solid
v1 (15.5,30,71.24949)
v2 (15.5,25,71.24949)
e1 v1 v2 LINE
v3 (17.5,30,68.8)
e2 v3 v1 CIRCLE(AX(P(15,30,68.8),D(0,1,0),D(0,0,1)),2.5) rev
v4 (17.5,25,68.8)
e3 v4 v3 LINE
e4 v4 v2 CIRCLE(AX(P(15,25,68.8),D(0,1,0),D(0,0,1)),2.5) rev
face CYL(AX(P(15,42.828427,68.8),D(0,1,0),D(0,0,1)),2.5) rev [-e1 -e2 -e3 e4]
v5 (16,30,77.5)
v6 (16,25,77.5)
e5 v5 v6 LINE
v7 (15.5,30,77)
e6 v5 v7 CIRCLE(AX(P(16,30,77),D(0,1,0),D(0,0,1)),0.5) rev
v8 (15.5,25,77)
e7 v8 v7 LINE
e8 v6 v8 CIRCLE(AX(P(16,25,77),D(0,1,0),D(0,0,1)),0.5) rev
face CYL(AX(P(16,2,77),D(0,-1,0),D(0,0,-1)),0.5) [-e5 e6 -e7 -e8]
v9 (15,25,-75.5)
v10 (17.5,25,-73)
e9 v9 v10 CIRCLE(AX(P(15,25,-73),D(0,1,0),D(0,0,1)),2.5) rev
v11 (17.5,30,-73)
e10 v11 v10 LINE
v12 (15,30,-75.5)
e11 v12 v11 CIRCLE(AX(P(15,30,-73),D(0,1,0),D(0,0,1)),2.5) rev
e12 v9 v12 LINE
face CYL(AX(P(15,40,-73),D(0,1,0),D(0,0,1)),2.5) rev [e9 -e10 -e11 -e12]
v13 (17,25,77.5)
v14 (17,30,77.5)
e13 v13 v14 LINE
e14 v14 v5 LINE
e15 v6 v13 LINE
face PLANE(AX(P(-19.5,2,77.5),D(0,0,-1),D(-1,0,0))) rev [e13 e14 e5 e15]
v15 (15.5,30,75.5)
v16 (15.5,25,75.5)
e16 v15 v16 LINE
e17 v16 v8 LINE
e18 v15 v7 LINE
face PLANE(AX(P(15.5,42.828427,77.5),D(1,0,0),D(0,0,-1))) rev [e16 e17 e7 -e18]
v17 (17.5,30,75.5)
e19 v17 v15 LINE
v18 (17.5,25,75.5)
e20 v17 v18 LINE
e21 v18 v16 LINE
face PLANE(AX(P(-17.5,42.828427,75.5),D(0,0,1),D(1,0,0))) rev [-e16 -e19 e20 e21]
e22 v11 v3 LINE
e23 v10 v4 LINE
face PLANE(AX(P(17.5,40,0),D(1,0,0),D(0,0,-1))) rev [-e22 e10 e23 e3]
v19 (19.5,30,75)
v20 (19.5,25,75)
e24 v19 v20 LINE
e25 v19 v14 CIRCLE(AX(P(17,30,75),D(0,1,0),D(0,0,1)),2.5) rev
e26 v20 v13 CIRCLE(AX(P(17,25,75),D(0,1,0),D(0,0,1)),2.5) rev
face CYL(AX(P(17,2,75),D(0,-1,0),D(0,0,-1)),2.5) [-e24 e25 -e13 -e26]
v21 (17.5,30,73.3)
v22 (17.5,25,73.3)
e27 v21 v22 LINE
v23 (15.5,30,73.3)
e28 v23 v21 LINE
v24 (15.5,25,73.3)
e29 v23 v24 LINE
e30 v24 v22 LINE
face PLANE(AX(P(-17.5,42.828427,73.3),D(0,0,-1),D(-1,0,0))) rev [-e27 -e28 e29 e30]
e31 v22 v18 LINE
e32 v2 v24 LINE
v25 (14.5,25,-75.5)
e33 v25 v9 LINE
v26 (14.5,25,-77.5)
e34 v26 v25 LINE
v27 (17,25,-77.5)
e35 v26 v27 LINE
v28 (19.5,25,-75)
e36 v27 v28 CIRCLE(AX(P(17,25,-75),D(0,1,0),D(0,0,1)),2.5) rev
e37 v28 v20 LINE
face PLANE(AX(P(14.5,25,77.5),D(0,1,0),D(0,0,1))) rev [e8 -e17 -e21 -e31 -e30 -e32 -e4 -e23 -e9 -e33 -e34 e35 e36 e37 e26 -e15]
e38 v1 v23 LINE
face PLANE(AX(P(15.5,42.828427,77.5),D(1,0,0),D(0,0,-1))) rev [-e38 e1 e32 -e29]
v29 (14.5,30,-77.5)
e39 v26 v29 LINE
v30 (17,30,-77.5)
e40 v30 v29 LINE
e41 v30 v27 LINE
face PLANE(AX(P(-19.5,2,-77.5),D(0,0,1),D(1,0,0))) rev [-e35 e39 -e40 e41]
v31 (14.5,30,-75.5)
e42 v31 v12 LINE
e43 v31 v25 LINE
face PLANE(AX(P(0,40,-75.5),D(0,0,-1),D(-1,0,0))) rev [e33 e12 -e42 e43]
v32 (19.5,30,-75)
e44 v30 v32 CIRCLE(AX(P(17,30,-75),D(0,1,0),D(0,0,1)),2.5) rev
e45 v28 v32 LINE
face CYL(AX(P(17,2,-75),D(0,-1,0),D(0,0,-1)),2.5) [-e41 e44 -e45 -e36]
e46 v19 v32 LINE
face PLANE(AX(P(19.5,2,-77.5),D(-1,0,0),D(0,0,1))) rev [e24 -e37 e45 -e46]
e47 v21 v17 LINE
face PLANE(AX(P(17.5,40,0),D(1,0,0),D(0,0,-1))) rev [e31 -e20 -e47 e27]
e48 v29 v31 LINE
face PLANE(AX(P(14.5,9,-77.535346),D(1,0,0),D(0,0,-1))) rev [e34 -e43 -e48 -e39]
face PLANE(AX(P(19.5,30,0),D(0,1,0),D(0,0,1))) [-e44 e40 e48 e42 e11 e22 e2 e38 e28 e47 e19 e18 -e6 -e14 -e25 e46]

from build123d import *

# Parameters (mm, degrees)
SKETCH1_W                       = 39
SKETCH1_H                       = 155
BOSS_EXTRUDE1_DEPTH             = 2
BOSS_EXTRUDE2_DEPTH             = 38
SKETCH3_W                       = 2
SKETCH3_H                       = 2
BOSS_EXTRUDE3_DEPTH             = 38
SKETCH4_W                       = 2
SKETCH4_H                       = 2
BOSS_EXTRUDE4_DEPTH             = 151
SKETCH6_W                       = 35
SKETCH6_H                       = 2.2
CUT_EXTRUDE1_DEPTH              = 160.340045186
SKETCH7_W                       = 35
SKETCH7_H                       = 2.2
CUT_EXTRUDE2_DEPTH              = 89.490112442
SKETCH5_W                       = 31
SKETCH5_H                       = 2
BOSS_EXTRUDE5_DEPTH             = 2
BOSS_EXTRUDE6_REACH             = 91.367
SKETCH8_W                       = 2
SKETCH8_H                       = 2
BOSS_EXTRUDE6_DIRECTION_2_REACH = 91.367
SKETCH10_W                      = 2
SKETCH10_H                      = 2.2
SKETCH10_W_2                    = 2.2
SKETCH10_H_2                    = 2
BOSS_EXTRUDE8_DEPTH             = 2
SKETCH11_W                      = 2
SKETCH11_H                      = 2.2
SKETCH11_W_2                    = 2.2
SKETCH11_H_2                    = 2
BOSS_EXTRUDE9_DEPTH             = 2
FILLET2_R                       = 2.5
SKETCH14_W                      = 36.5
SKETCH14_H                      = 7.75
BOSS_EXTRUDE10_DEPTH            = 2
SKETCH13_W                      = 31
SKETCH13_H                      = 3
CUT_EXTRUDE4_DEPTH              = 2
FILLET3_R                       = 2
FILLET4_R                       = 0.5
SKETCH15_R                      = 5.1
CUT_EXTRUDE5_DEPTH              = 90.367219941
SKETCH16_R                      = 7.1
BOSS_EXTRUDE11_DEPTH            = 1
FILLET5_R                       = 0.5
CUT_EXTRUDE3_DEPTH              = 160.340045186
FILLET6_R                       = 0.4
FILLET7_R                       = 0.5
CUT_EXTRUDE6_DEPTH              = 6
SKETCH18_W                      = 29
SKETCH18_H                      = 3
CUT_EXTRUDE8_DEPTH              = 90.367220028
CUT_EXTRUDE11_DEPTH             = 90.367220028
CUT_EXTRUDE11_DEPTH_BACK        = 90.367220028
SKETCH20_W                      = 29
SKETCH20_H                      = 34
SKETCH21_W                      = 155
SKETCH21_H                      = 10
CUT_EXTRUDE12_DEPTH             = 90.367219941
SKETCH22_W                      = 155
SKETCH22_H                      = 15
CUT_EXTRUDE13_DEPTH             = 84.254129027


with BuildPart() as part:
    # Sketch1 → Boss-Extrude1 (new body)
    with BuildSketch(Plane(origin=(0, 0, 0), x_dir=(1, 0, 0), z_dir=(0, 1, 0))):
        Rectangle(SKETCH1_W, SKETCH1_H)
    extrude(amount=BOSS_EXTRUDE1_DEPTH)

    # Sketch2 → Boss-Extrude2 (add)
    with BuildSketch(Plane(origin=(0, 2, 0), x_dir=(1, 0, 0), z_dir=(0, 1, 0))):
        Polygon((-17.5, -77.5), (-17.5, -75.5), (-17.5, 75.5), (17.5, 75.5), (17.5, -75.5), (17.5, -77.5), (19.5, -77.5), (19.5, 77.5), (-19.5, 77.5), (-19.5, -77.5), align=None)
    extrude(amount=BOSS_EXTRUDE2_DEPTH)

    # Sketch3 → Boss-Extrude3 (add)
    with BuildSketch(Plane(origin=(0, 2, 0), x_dir=(1, 0, 0), z_dir=(0, 1, 0))):
        with Locations((-16.5, -76.5)):
            Rectangle(SKETCH3_W, SKETCH3_H)
        with Locations((-16.5, -72.3)):
            Rectangle(SKETCH3_W, SKETCH3_H)
        with Locations((16.5, -76.5)):
            Rectangle(SKETCH3_W, SKETCH3_H)
        with Locations((16.5, -72.3)):
            Rectangle(SKETCH3_W, SKETCH3_H)
    extrude(amount=BOSS_EXTRUDE3_DEPTH)

    # Sketch4 → Boss-Extrude4 (add)
    with BuildSketch(Plane.XY.offset(-75.5)):
        with Locations((-16.5, 39)):
            Rectangle(SKETCH4_W, SKETCH4_H)
        Polygon((-15.5, 33.8), (-17.5, 31.8), (-17.5, 35.8), (-15.5, 35.8), align=None)
        Polygon((15.5, 35.8), (17.5, 35.8), (17.5, 31.8), (15.5, 33.8), align=None)
        with Locations((16.5, 39)):
            Rectangle(SKETCH4_W, SKETCH4_H)
    extrude(amount=BOSS_EXTRUDE4_DEPTH)

    # Sketch6 → Cut-Extrude1 (cut, through all)
    with BuildSketch(Plane.XY.offset(-75.5)):
        with Locations((0, 36.9)):
            Rectangle(SKETCH6_W, SKETCH6_H)
    extrude(amount=CUT_EXTRUDE1_DEPTH, mode=Mode.SUBTRACT)

    # Sketch7 → Cut-Extrude2 (cut, through all)
    with BuildSketch(Plane(origin=(0, 2, 0), x_dir=(1, 0, 0), z_dir=(0, 1, 0))):
        with Locations((0, -74.4)):
            Rectangle(SKETCH7_W, SKETCH7_H)
    extrude(amount=CUT_EXTRUDE2_DEPTH, mode=Mode.SUBTRACT)

    # Sketch5 → Boss-Extrude5 (add)
    with BuildSketch(Plane(origin=(0, 2, 0), x_dir=(1, 0, 0), z_dir=(0, 1, 0))):
        with Locations((0, -76.5)):
            Rectangle(SKETCH5_W, SKETCH5_H)
        with Locations((0, -72.3)):
            Rectangle(SKETCH5_W, SKETCH5_H)
    extrude(amount=BOSS_EXTRUDE5_DEPTH)

    # Boss-Extrude6: up to this face of the body (flat: up to its plane)
    boss_extrude6_end = Plane(part.part.faces().sort_by_distance((17.5, 16.9, -2.1))[0])
    # Sketch8 → Boss-Extrude6 (add, up to the picked face)
    with BuildSketch(Plane(origin=(0, 0, 0), x_dir=(0, 0, -1), z_dir=(1, 0, 0)), mode=Mode.PRIVATE) as boss_extrude6_sk1:
        with Locations((74.5, 39)):
            Rectangle(SKETCH8_W, SKETCH8_H)
    boss_extrude6_tool1 = split(extrude(boss_extrude6_sk1.sketch, amount=BOSS_EXTRUDE6_REACH, mode=Mode.PRIVATE), bisect_by=boss_extrude6_end, keep=Keep.BOTH, mode=Mode.PRIVATE)
    # Sketch8 → Boss-Extrude6 (add, up to the picked face)
    with BuildSketch(Plane(origin=(0, 0, 0), x_dir=(0, 0, -1), z_dir=(1, 0, 0)), mode=Mode.PRIVATE) as boss_extrude6_sk2:
        Polygon((75.5, 35.8), (73.5, 35.8), (73.5, 33.8), (75.5, 31.8), align=None)
    boss_extrude6_tool2 = split(extrude(boss_extrude6_sk2.sketch, amount=BOSS_EXTRUDE6_REACH, mode=Mode.PRIVATE), bisect_by=boss_extrude6_end, keep=Keep.BOTH, mode=Mode.PRIVATE)
    add(boss_extrude6_tool1.solids().sort_by(Axis((0, 39, -74.5), (1, 0, 0)))[0])
    add(boss_extrude6_tool2.solids().sort_by(Axis((0, 34.244444, -74.611111), (1, 0, 0)))[0])

    # Boss-Extrude6 direction 2: up to this face of the body (flat: up to its plane)
    boss_extrude6_direction_2_end = Plane(part.part.faces().sort_by_distance((-17.5, 16.9, -2.1))[0])
    # Sketch8 → Boss-Extrude6 direction 2 (add, up to the picked face)
    with BuildSketch(Plane(origin=(0, 0, 0), x_dir=(0, 0, -1), z_dir=(1, 0, 0)), mode=Mode.PRIVATE) as boss_extrude6_direction_2_sk1:
        with Locations((74.5, 39)):
            Rectangle(SKETCH8_W, SKETCH8_H)
    boss_extrude6_direction_2_tool1 = split(extrude(boss_extrude6_direction_2_sk1.sketch, amount=-BOSS_EXTRUDE6_DIRECTION_2_REACH, mode=Mode.PRIVATE), bisect_by=boss_extrude6_direction_2_end, keep=Keep.BOTH, mode=Mode.PRIVATE)
    # Sketch8 → Boss-Extrude6 direction 2 (add, up to the picked face)
    with BuildSketch(Plane(origin=(0, 0, 0), x_dir=(0, 0, -1), z_dir=(1, 0, 0)), mode=Mode.PRIVATE) as boss_extrude6_direction_2_sk2:
        Polygon((75.5, 35.8), (73.5, 35.8), (73.5, 33.8), (75.5, 31.8), align=None)
    boss_extrude6_direction_2_tool2 = split(extrude(boss_extrude6_direction_2_sk2.sketch, amount=-BOSS_EXTRUDE6_DIRECTION_2_REACH, mode=Mode.PRIVATE), bisect_by=boss_extrude6_direction_2_end, keep=Keep.BOTH, mode=Mode.PRIVATE)
    add(boss_extrude6_direction_2_tool1.solids().sort_by(Axis((0, 39, -74.5), (-1, 0, 0)))[0])
    add(boss_extrude6_direction_2_tool2.solids().sort_by(Axis((0, 34.244444, -74.611111), (-1, 0, 0)))[0])

    # Sketch10 → Boss-Extrude8 (add)
    with BuildSketch(Plane(origin=(-17.5, 0, 0), x_dir=(0, 0, -1), z_dir=(1, 0, 0))):
        with Locations((-76.5, 36.9)):
            Rectangle(SKETCH10_W, SKETCH10_H)
        with Locations((-74.4, 39)):
            Rectangle(SKETCH10_W_2, SKETCH10_H_2)
    extrude(amount=BOSS_EXTRUDE8_DEPTH)

    # Sketch11 → Boss-Extrude9 (add)
    with BuildSketch(Plane.ZY.offset(-17.5)):
        with Locations((76.5, 36.9)):
            Rectangle(SKETCH11_W, SKETCH11_H)
        with Locations((74.4, 39)):
            Rectangle(SKETCH11_W_2, SKETCH11_H_2)
    extrude(amount=BOSS_EXTRUDE9_DEPTH)

    # Fillet2
    fillet2_edges = [part.edges().sort_by_distance(p)[0] for p in [
        (-17.5, 16.9, 71.3),
        (17.5, 16.9, 71.3),
        (19.5, 20, 77.5),
        (-19.5, 20, 77.5),
        (-19.5, 20, -77.5),
        (-17.5, 16.9, -75.5),
        (17.5, 16.9, -75.5),
        (19.5, 20, -77.5),
        (19.5, 40, 0),
        (-19.5, 40, 0),
        (19.5, 0, 0),
        (-19.5, 0, 0),
        (0, 40, -77.5),
        (0, 0, 77.5),
        (0, 0, -77.5),
        (-17.5, 40, 77.5),
        (17.5, 40, 77.5),
    ]]
    fillet(fillet2_edges, radius=FILLET2_R)

    # Sketch14 → Boss-Extrude10 (add)
    with BuildSketch(Plane.XY.offset(-75.5)):
        with Locations((0, 5.125)):
            Rectangle(SKETCH14_W, SKETCH14_H)
    extrude(amount=BOSS_EXTRUDE10_DEPTH)

    # Sketch13 → Cut-Extrude4 (cut)
    with BuildSketch(Plane(origin=(0, 0, -77.5), x_dir=(-1, 0, 0), z_dir=(0, 0, -1))):
        with Locations((0, 5.5)):
            Rectangle(SKETCH13_W, SKETCH13_H)
    extrude(amount=-CUT_EXTRUDE4_DEPTH, mode=Mode.SUBTRACT)

    # Fillet3
    fillet3_edges = [part.edges().sort_by_distance(p)[0] for p in [
        (0, 9, -73.5),
    ]]
    fillet(fillet3_edges, radius=FILLET3_R - 0.0001)  # a hair under: the kernel refuses the full size

    # Fillet4
    fillet4_edges = [part.edges().sort_by_distance(p)[0] for p in [
        (15.5, 5.5, -75.5),
        (15.5, 4, -76.5),
        (0, 7, -75.5),
        (15.5, 7, -76.5),
        (-15.5, 5.5, -75.5),
        (-15.5, 7, -76.5),
        (0, 4, -75.5),
        (-15.5, 4, -76.5),
        (15.5, 5.5, -77.5),
        (0, 4, -77.5),
        (-15.5, 5.5, -77.5),
        (0, 7, -77.5),
    ]]
    fillet(fillet4_edges, radius=FILLET4_R)

    # Sketch15 → Cut-Extrude5 (cut, through all)
    with BuildSketch(Plane.XZ):
        with Locations(Location((0, 38.75, 0), (0, 0, 270))):
            Circle(SKETCH15_R)
        with Locations(Location((0, -38.75, 0), (0, 0, 270))):
            Circle(SKETCH15_R)
    extrude(amount=-CUT_EXTRUDE5_DEPTH, mode=Mode.SUBTRACT)

    # Sketch16 → Boss-Extrude11 (add)
    with BuildSketch(Plane(origin=(0, 2, 0), x_dir=(1, 0, 0), z_dir=(0, 1, 0))):
        with Locations(Location((0, 38.75, 0), (0, 0, 270))):
            Circle(SKETCH16_R)
        with Locations(Location((0, -38.75, 0), (0, 0, 270))):
            Circle(SKETCH16_R)
    extrude(amount=BOSS_EXTRUDE11_DEPTH)

    # Fillet5
    fillet5_edges = [part.edges().sort_by_distance(p)[0] for p in [
        (0, 2, -45.85),
        (0, 3, -45.85),
        (0, 2, 31.65),
        (0, 3, 31.65),
    ]]
    fillet(fillet5_edges, radius=FILLET5_R - 0.0001)  # a hair under: the kernel refuses the full size

    # Sketch12 → Cut-Extrude3 (cut, through all)
    with BuildSketch(Plane.XY.offset(-75.5)):
        with BuildLine():
            Line((1.668907005, 12.688040659), (2.22520934, 10.250720878))
            ThreePointArc((2.22520934, 10.250720878), (4.338837391, 10.990311321), (6.234898019, 12.181685175))
            Line((6.234898019, 12.181685175), (4.676173514, 14.136263881))
            ThreePointArc((4.676173514, 14.136263881), (3.254128043, 13.242733491), (1.668907005, 12.688040659))
        make_face()
        with BuildLine():
            ThreePointArc((-6.234898019, 12.181685175), (-4.338837391, 10.990311321), (-2.22520934, 10.250720878))
            Line((-2.22520934, 10.250720878), (-1.668907005, 12.688040659))
            ThreePointArc((-1.668907005, 12.688040659), (-3.254128043, 13.242733491), (-4.676173514, 14.136263881))
            Line((-4.676173514, 14.136263881), (-6.234898019, 12.181685175))
        make_face()
        with BuildLine():
            ThreePointArc((-10, 20), (-9.749279122, 17.77479066), (-9.009688679, 15.661162609))
            Line((-9.009688679, 15.661162609), (-6.757266509, 16.745871957))
            ThreePointArc((-6.757266509, 16.745871957), (-7.311959341, 18.331092995), (-7.5, 20))
            Line((-7.5, 20), (-10, 20))
        make_face()
        with BuildLine():
            ThreePointArc((-6.234898019, 27.818314825), (-7.818314825, 26.234898019), (-9.009688679, 24.338837391))
            Line((-9.009688679, 24.338837391), (-6.757266509, 23.254128043))
            ThreePointArc((-6.757266509, 23.254128043), (-5.863736119, 24.676173514), (-4.676173514, 25.863736119))
            Line((-4.676173514, 25.863736119), (-6.234898019, 27.818314825))
        make_face()
        with BuildLine():
            ThreePointArc((-1.668907005, 27.311959341), (-0.839733571, 27.452841574), (0, 27.5))
            Line((0, 27.5), (0, 30))
            ThreePointArc((0, 30), (-1.119644761, 29.937122099), (-2.22520934, 29.749279122))
            Line((-2.22520934, 29.749279122), (-1.668907005, 27.311959341))
        make_face()
        with BuildLine():
            Line((0, 30), (0, 27.5))
            ThreePointArc((0, 27.5), (0.839733571, 27.452841574), (1.668907005, 27.311959341))
            Line((1.668907005, 27.311959341), (2.22520934, 29.749279122))
            ThreePointArc((2.22520934, 29.749279122), (1.119644761, 29.937122099), (0, 30))
        make_face()
        with BuildLine():
            Line((6.757266509, 23.254128043), (9.009688679, 24.338837391))
            ThreePointArc((9.009688679, 24.338837391), (7.818314825, 26.234898019), (6.234898019, 27.818314825))
            Line((6.234898019, 27.818314825), (4.676173514, 25.863736119))
            ThreePointArc((4.676173514, 25.863736119), (5.863736119, 24.676173514), (6.757266509, 23.254128043))
        make_face()
        with BuildLine():
            Line((6.757266509, 16.745871957), (9.009688679, 15.661162609))
            ThreePointArc((9.009688679, 15.661162609), (9.749279122, 17.77479066), (10, 20))
            Line((10, 20), (7.5, 20))
            ThreePointArc((7.5, 20), (7.311959341, 18.331092995), (6.757266509, 16.745871957))
        make_face()
        with BuildLine():
            ThreePointArc((2.5, 20), (2.43731978, 19.443697665), (2.25242217, 18.915290652))
            Line((2.25242217, 18.915290652), (4.50484434, 17.830581304))
            ThreePointArc((4.50484434, 17.830581304), (4.874639561, 18.88739533), (5, 20))
            Line((5, 20), (2.5, 20))
        make_face()
        with BuildLine():
            ThreePointArc((1.558724505, 21.954578706), (1.954578706, 21.558724505), (2.25242217, 21.084709348))
            Line((2.25242217, 21.084709348), (4.50484434, 22.169418696))
            ThreePointArc((4.50484434, 22.169418696), (3.909157412, 23.117449009), (3.117449009, 23.909157412))
            Line((3.117449009, 23.909157412), (1.558724505, 21.954578706))
        make_face()
        with BuildLine():
            Line((0, 25), (0, 22.5))
            ThreePointArc((0, 22.5), (0.27991119, 22.484280525), (0.556302335, 22.43731978))
            Line((0.556302335, 22.43731978), (1.11260467, 24.874639561))
            ThreePointArc((1.11260467, 24.874639561), (0.559822381, 24.968561049), (0, 25))
        make_face()
        with BuildLine():
            ThreePointArc((-0.556302335, 22.43731978), (-0.27991119, 22.484280525), (0, 22.5))
            Line((0, 22.5), (0, 25))
            ThreePointArc((0, 25), (-0.559822381, 24.968561049), (-1.11260467, 24.874639561))
            Line((-1.11260467, 24.874639561), (-0.556302335, 22.43731978))
        make_face()
        with BuildLine():
            ThreePointArc((-2.25242217, 21.084709348), (-1.954578706, 21.558724505), (-1.558724505, 21.954578706))
            Line((-1.558724505, 21.954578706), (-3.117449009, 23.909157412))
            ThreePointArc((-3.117449009, 23.909157412), (-3.909157412, 23.117449009), (-4.50484434, 22.169418696))
            Line((-4.50484434, 22.169418696), (-2.25242217, 21.084709348))
        make_face()
        with BuildLine():
            ThreePointArc((-2.25242217, 18.915290652), (-2.43731978, 19.443697665), (-2.5, 20))
            Line((-2.5, 20), (-5, 20))
            ThreePointArc((-5, 20), (-4.874639561, 18.88739533), (-4.50484434, 17.830581304))
            Line((-4.50484434, 17.830581304), (-2.25242217, 18.915290652))
        make_face()
        with BuildLine():
            ThreePointArc((-3.117449009, 16.090842588), (-2.169418696, 15.49515566), (-1.11260467, 15.125360439))
            Line((-1.11260467, 15.125360439), (-0.556302335, 17.56268022))
            ThreePointArc((-0.556302335, 17.56268022), (-1.084709348, 17.74757783), (-1.558724505, 18.045421294))
            Line((-1.558724505, 18.045421294), (-3.117449009, 16.090842588))
        make_face()
        with BuildLine():
            Line((0.556302335, 17.56268022), (1.11260467, 15.125360439))
            ThreePointArc((1.11260467, 15.125360439), (2.169418696, 15.49515566), (3.117449009, 16.090842588))
            Line((3.117449009, 16.090842588), (1.558724505, 18.045421294))
            ThreePointArc((1.558724505, 18.045421294), (1.084709348, 17.74757783), (0.556302335, 17.56268022))
        make_face()
    extrude(amount=-CUT_EXTRUDE3_DEPTH, mode=Mode.SUBTRACT)

    # Fillet6
    fillet6_edges = [part.edges().sort_by_distance(p)[0] for p in [
        (5.863736119, 24.676173514, -75.5),
        (5.455535766, 26.841025472, -75.5),
        (7.818314825, 26.234898019, -77.5),
        (7.883477594, 23.796482717, -77.5),
        (5.863736119, 24.676173514, -77.5),
        (5.455535766, 26.841025472, -77.5),
        (7.883477594, 23.796482717, -75.5),
        (7.818314825, 26.234898019, -75.5),
        (7.311959341, 18.331092995, -75.5),
        (8.75, 20, -75.5),
        (9.749279122, 17.77479066, -77.5),
        (7.883477594, 16.203517283, -77.5),
        (7.311959341, 18.331092995, -77.5),
        (8.75, 20, -77.5),
        (7.883477594, 16.203517283, -75.5),
        (9.749279122, 17.77479066, -75.5),
        (2.43731978, 19.443697665, -75.5),
        (3.75, 20, -75.5),
        (4.874639561, 18.88739533, -77.5),
        (3.378633255, 18.372935978, -77.5),
        (2.43731978, 19.443697665, -77.5),
        (3.75, 20, -77.5),
        (3.378633255, 18.372935978, -75.5),
        (4.874639561, 18.88739533, -75.5),
        (1.954578706, 21.558724505, -75.5),
        (2.338086757, 22.931868059, -75.5),
        (3.909157412, 23.117449009, -77.5),
        (3.378633255, 21.627064022, -77.5),
        (1.954578706, 21.558724505, -77.5),
        (2.338086757, 22.931868059, -77.5),
        (3.378633255, 21.627064022, -75.5),
        (3.909157412, 23.117449009, -75.5),
        (0, 27.5, -75.5),
        (-1.947058172, 28.530619232, -75.5),
        (0, 30, -77.5),
        (1.947058172, 28.530619232, -77.5),
        (0, 27.5, -77.5),
        (-1.947058172, 28.530619232, -77.5),
        (1.947058172, 28.530619232, -75.5),
        (0, 30, -75.5),
        (-5.863736119, 24.676173514, -75.5),
        (-7.883477594, 23.796482717, -75.5),
        (-7.818314825, 26.234898019, -77.5),
        (-5.455535766, 26.841025472, -77.5),
        (-5.863736119, 24.676173514, -77.5),
        (-7.883477594, 23.796482717, -77.5),
        (-5.455535766, 26.841025472, -75.5),
        (-7.818314825, 26.234898019, -75.5),
        (-7.311959341, 18.331092995, -75.5),
        (-7.883477594, 16.203517283, -75.5),
        (-9.749279122, 17.77479066, -77.5),
        (-8.75, 20, -77.5),
        (-7.311959341, 18.331092995, -77.5),
        (-7.883477594, 16.203517283, -77.5),
        (-8.75, 20, -75.5),
        (-9.749279122, 17.77479066, -75.5),
        (-3.254128043, 13.242733491, -75.5),
        (-1.947058172, 11.469380768, -75.5),
        (-4.338837391, 10.990311321, -77.5),
        (-5.455535766, 13.158974528, -77.5),
        (-3.254128043, 13.242733491, -77.5),
        (-1.947058172, 11.469380768, -77.5),
        (-5.455535766, 13.158974528, -75.5),
        (-4.338837391, 10.990311321, -75.5),
        (1.084709348, 17.74757783, -75.5),
        (2.338086757, 17.068131941, -75.5),
        (2.169418696, 15.49515566, -77.5),
        (0.834453502, 16.344020329, -77.5),
        (1.084709348, 17.74757783, -77.5),
        (2.338086757, 17.068131941, -77.5),
        (0.834453502, 16.344020329, -75.5),
        (2.169418696, 15.49515566, -75.5),
        (-2.43731978, 19.443697665, -75.5),
        (-3.378633255, 18.372935978, -75.5),
        (-4.874639561, 18.88739533, -77.5),
        (-3.75, 20, -77.5),
        (-2.43731978, 19.443697665, -77.5),
        (-3.378633255, 18.372935978, -77.5),
        (-3.75, 20, -75.5),
        (-4.874639561, 18.88739533, -75.5),
        (-1.084709348, 17.74757783, -75.5),
        (-0.834453502, 16.344020329, -75.5),
        (-2.169418696, 15.49515566, -77.5),
        (-2.338086757, 17.068131941, -77.5),
        (-1.084709348, 17.74757783, -77.5),
        (-0.834453502, 16.344020329, -77.5),
        (-2.338086757, 17.068131941, -75.5),
        (-2.169418696, 15.49515566, -75.5),
        (-1.954578706, 21.558724505, -75.5),
        (-3.378633255, 21.627064022, -75.5),
        (-3.909157412, 23.117449009, -77.5),
        (-2.338086757, 22.931868059, -77.5),
        (-1.954578706, 21.558724505, -77.5),
        (-3.378633255, 21.627064022, -77.5),
        (-2.338086757, 22.931868059, -75.5),
        (-3.909157412, 23.117449009, -75.5),
        (0, 25, -77.5),
        (0.834453502, 23.655979671, -77.5),
        (0, 22.5, -75.5),
        (-0.834453502, 23.655979671, -75.5),
        (0, 22.5, -77.5),
        (-0.834453502, 23.655979671, -77.5),
        (0, 25, -75.5),
        (0.834453502, 23.655979671, -75.5),
        (3.254128043, 13.242733491, -75.5),
        (5.455535766, 13.158974528, -75.5),
        (4.338837391, 10.990311321, -77.5),
        (1.947058172, 11.469380768, -77.5),
        (3.254128043, 13.242733491, -77.5),
        (5.455535766, 13.158974528, -77.5),
        (1.947058172, 11.469380768, -75.5),
        (4.338837391, 10.990311321, -75.5),
    ]]
    fillet(fillet6_edges, radius=FILLET6_R)

    # Fillet7
    fillet7_edges = [part.edges().sort_by_distance(p)[0] for p in [
        (15.5, 40, 0.75),
        (0, 4, 77.5),
        (0, 40, -73.5),
        (-15.5, 40, 0.75),
        (-15.5, 20.75, 77.5),
        (-15.5, 39.267766953, 76.767766953),
        (15.5, 20.75, 77.5),
        (15.5, 39.267766953, 76.767766953),
    ]]
    fillet(fillet7_edges, radius=FILLET7_R)

    # Sketch17 → Cut-Extrude6 (cut)
    with BuildSketch(Plane.XZ):
        Polygon((-17, -77.5), (-17, 70.299999999), (-14.999999999, 71.3), (-14.999999999, 77.5), (14.999999999, 77.5), (14.999999999, 71.3), (17, 70.299999999), (17, -77.5), align=None)
    extrude(amount=-CUT_EXTRUDE6_DEPTH, mode=Mode.SUBTRACT)

    # Sketch18 → Cut-Extrude8 (cut, through all)
    with BuildSketch(Plane.XY):
        with Locations((0, 7.5)):
            Rectangle(SKETCH18_W, SKETCH18_H)
    extrude(amount=-CUT_EXTRUDE8_DEPTH, mode=Mode.SUBTRACT)

    # Sketch20 → Cut-Extrude11 (cut, two sides: drawn at the far end of the back side and taken through both)
    with BuildSketch(Plane.XY.offset(-CUT_EXTRUDE11_DEPTH_BACK)):
        with Locations((0, 23)):
            Rectangle(SKETCH20_W, SKETCH20_H)
    extrude(amount=CUT_EXTRUDE11_DEPTH + CUT_EXTRUDE11_DEPTH_BACK, mode=Mode.SUBTRACT)


with BuildPart() as body_2:
    # of the pieces the cut leaves, the one that is kept (cut_extrude11_keep)
    add(part.part.solids().sort_by_distance((14.5, 40, -75))[0])

    # Sketch21 → Cut-Extrude12 (cut, through all)
    with BuildSketch(Plane(origin=(0, 0, 0), x_dir=(0, 0, -1), z_dir=(1, 0, 0))):
        with Locations((0, 35)):
            Rectangle(SKETCH21_W, SKETCH21_H)
        with Locations((0, 5)):
            Rectangle(SKETCH21_W, SKETCH21_H)
    extrude(amount=CUT_EXTRUDE12_DEPTH, mode=Mode.SUBTRACT)

    # Sketch22 → Cut-Extrude13 (cut, through all)
    with BuildSketch(Plane(origin=(19.5, 0, 0), x_dir=(0, 0, -1), z_dir=(1, 0, 0))):
        with Locations((0, 17.5)):
            Rectangle(SKETCH22_W, SKETCH22_H)
    extrude(amount=-CUT_EXTRUDE13_DEPTH, mode=Mode.SUBTRACT)


solid = body_2.part
